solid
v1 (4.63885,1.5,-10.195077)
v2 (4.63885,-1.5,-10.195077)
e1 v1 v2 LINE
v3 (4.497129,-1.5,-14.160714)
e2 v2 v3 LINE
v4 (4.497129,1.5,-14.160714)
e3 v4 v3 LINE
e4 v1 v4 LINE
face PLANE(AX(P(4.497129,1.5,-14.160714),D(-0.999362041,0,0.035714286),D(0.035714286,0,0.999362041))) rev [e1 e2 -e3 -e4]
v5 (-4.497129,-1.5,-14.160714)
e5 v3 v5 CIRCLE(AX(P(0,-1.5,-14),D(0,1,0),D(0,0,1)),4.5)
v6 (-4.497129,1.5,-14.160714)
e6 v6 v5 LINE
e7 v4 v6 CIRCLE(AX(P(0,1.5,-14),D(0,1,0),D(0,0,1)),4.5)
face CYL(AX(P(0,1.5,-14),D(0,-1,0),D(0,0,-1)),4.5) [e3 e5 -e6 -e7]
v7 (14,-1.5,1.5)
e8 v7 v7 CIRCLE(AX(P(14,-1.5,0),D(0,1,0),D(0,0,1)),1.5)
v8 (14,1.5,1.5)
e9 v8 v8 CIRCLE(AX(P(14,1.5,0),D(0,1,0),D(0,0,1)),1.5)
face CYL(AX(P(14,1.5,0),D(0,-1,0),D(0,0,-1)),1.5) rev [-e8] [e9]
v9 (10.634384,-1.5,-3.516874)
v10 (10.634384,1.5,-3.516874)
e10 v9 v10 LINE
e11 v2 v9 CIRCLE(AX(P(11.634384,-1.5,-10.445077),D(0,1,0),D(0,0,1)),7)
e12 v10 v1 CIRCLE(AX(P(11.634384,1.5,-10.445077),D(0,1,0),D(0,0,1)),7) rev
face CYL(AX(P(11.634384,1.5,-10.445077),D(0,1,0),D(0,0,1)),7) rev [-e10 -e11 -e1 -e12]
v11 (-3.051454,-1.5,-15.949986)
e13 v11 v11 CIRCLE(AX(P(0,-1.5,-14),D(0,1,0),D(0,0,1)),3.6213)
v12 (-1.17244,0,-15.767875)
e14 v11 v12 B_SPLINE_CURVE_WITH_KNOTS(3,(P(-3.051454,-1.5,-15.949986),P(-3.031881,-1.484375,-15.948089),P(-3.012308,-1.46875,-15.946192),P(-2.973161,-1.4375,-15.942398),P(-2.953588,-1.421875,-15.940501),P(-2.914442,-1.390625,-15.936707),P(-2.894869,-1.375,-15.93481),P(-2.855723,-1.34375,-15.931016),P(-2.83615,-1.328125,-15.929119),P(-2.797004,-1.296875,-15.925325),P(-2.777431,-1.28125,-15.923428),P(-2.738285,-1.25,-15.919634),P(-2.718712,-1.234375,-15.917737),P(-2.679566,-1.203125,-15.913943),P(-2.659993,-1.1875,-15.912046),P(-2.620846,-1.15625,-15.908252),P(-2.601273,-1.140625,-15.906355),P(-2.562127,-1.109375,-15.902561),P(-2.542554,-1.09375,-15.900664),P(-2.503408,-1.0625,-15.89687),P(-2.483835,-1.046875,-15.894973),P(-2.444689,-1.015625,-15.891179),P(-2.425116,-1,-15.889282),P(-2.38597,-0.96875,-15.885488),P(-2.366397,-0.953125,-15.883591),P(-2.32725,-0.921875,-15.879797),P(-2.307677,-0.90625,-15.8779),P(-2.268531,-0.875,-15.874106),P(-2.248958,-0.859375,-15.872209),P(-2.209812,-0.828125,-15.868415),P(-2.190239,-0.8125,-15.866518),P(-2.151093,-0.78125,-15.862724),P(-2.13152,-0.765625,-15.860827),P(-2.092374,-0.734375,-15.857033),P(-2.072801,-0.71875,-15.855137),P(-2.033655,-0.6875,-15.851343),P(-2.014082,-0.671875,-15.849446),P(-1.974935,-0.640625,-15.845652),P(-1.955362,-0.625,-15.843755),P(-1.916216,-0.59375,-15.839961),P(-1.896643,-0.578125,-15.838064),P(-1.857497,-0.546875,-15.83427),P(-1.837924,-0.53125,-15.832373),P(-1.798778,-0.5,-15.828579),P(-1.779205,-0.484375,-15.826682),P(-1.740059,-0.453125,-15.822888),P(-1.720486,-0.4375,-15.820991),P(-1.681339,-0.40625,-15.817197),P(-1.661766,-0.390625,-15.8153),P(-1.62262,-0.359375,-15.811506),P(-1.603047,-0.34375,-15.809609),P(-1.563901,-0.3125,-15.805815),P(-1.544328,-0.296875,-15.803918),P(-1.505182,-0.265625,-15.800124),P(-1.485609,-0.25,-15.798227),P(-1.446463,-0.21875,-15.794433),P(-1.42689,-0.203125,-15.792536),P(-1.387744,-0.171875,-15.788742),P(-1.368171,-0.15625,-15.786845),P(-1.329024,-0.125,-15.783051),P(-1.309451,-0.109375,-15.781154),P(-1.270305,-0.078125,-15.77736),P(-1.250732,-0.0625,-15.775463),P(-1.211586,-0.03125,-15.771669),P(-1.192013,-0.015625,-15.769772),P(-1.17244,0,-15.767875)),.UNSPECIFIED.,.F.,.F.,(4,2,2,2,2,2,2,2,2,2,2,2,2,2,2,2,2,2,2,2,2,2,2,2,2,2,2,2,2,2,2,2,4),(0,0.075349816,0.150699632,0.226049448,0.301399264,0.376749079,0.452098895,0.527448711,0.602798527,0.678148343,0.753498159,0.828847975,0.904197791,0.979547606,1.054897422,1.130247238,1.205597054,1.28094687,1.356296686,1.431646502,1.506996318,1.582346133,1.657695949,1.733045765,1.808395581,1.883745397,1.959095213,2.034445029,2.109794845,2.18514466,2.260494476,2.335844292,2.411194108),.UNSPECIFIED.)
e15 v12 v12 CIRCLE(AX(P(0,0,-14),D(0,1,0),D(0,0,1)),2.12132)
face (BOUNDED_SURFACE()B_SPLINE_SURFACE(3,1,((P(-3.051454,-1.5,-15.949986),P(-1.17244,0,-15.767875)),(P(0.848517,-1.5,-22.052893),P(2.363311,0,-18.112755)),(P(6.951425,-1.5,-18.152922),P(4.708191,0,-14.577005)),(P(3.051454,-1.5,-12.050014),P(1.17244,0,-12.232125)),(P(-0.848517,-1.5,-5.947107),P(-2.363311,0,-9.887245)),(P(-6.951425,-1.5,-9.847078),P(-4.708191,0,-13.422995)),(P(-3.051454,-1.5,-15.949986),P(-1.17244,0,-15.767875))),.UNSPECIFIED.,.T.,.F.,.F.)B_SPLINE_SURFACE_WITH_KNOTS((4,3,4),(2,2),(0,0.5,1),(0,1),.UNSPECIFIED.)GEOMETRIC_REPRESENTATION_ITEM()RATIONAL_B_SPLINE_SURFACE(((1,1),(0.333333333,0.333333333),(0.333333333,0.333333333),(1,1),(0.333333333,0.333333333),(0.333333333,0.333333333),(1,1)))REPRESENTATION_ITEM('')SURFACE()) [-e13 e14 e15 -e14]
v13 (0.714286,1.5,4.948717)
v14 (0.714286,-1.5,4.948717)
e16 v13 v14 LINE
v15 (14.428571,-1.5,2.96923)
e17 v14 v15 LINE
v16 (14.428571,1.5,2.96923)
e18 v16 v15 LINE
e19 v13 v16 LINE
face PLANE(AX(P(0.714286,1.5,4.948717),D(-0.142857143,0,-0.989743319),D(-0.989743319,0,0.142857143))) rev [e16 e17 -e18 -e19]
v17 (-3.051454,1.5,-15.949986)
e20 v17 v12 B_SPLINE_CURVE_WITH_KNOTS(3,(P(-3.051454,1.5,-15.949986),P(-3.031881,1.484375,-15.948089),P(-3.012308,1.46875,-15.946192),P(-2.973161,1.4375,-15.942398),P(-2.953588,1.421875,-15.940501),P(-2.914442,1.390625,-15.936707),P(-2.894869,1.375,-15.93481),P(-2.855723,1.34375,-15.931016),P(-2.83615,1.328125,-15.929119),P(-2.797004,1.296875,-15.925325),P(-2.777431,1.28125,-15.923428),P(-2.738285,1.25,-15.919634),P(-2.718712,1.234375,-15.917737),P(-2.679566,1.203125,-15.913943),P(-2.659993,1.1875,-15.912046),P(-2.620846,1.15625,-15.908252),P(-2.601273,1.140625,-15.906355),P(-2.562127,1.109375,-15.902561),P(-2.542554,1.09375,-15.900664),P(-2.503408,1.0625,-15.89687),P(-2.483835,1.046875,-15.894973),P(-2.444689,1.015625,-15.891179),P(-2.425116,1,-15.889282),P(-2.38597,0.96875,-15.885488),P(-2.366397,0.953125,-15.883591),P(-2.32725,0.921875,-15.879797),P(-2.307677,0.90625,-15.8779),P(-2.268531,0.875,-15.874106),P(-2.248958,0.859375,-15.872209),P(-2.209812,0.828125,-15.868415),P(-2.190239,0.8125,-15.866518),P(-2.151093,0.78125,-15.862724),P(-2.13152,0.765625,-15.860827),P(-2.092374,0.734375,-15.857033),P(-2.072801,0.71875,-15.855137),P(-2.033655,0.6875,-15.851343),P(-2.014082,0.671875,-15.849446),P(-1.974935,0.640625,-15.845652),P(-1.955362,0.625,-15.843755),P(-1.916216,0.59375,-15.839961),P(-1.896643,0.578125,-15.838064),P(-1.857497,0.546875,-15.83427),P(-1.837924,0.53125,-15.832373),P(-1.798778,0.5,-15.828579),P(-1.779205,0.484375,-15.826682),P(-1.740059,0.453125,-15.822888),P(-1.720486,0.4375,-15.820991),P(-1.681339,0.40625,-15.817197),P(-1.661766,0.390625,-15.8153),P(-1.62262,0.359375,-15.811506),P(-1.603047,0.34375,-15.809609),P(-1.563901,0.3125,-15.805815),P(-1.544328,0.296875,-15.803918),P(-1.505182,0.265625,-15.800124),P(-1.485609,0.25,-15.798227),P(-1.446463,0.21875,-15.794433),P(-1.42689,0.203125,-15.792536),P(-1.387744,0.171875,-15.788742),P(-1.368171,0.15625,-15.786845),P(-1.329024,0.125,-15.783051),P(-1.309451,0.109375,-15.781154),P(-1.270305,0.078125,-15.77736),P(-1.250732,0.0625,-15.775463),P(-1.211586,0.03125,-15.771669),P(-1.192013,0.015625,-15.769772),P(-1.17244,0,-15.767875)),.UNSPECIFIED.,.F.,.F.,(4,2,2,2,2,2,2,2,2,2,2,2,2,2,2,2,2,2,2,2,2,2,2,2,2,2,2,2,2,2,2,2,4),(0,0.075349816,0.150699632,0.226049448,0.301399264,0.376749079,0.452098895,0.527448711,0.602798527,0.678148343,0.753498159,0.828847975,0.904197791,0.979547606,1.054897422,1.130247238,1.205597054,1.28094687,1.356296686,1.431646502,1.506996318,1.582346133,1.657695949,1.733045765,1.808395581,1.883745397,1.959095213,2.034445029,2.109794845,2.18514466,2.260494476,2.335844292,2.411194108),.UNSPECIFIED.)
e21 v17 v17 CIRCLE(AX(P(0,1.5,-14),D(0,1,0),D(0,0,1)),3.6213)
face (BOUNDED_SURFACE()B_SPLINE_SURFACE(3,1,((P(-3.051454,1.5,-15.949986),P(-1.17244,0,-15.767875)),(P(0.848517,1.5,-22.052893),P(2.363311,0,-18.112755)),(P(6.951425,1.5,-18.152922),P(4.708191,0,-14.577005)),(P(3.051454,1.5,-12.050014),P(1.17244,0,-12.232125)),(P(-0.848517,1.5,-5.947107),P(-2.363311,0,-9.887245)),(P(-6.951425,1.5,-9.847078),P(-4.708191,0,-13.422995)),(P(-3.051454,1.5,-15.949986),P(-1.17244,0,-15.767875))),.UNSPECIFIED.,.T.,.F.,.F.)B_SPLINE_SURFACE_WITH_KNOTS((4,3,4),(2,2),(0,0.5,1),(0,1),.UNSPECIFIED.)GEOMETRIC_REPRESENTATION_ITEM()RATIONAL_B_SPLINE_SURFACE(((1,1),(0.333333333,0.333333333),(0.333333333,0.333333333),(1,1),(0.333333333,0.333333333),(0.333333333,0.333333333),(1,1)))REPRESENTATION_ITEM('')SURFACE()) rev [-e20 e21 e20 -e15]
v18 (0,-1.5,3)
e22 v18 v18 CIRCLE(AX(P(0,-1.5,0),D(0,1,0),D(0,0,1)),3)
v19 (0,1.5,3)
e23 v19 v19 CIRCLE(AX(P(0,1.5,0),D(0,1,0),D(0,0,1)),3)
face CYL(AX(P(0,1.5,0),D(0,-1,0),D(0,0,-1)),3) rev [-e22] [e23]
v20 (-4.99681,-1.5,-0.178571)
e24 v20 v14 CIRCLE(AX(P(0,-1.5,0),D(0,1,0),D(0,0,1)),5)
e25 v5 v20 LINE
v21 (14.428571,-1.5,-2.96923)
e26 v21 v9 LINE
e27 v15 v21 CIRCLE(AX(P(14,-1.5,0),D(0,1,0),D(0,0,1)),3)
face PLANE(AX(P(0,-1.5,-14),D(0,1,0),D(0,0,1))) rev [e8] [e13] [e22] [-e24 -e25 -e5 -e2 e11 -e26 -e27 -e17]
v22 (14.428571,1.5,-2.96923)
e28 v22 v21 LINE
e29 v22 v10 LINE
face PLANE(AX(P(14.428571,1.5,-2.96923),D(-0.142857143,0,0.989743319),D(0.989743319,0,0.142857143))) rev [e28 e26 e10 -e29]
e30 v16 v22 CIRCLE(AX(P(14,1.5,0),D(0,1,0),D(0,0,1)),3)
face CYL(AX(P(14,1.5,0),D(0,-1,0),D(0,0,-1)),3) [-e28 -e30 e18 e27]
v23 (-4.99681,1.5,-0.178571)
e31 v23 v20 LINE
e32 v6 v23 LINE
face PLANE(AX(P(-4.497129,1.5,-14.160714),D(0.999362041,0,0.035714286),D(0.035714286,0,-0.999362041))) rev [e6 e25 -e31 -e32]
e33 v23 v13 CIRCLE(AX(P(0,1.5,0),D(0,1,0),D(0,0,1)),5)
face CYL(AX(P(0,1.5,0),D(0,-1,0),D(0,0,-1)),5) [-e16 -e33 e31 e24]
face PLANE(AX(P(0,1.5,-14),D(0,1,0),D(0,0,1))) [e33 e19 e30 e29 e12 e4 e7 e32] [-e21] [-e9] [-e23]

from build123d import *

# Parameters (mm, degrees)
SKETCH1_R           = 3
SKETCH1_R_2         = 1.5
BOSS_EXTRUDE1_DEPTH = 1.5
FILLET1_R           = 7


with BuildPart() as part:
    # Sketch1 → Boss-Extrude1 (new, symmetric)
    with BuildSketch(Plane(origin=(0, 0, 0), x_dir=(1, 0, 0), z_dir=(0, 1, 0))):
        with BuildLine():
            Line((-4.497129186, 14.160714286), (-4.996810207, 0.178571429))
            ThreePointArc((-4.996810207, 0.178571429), (-3.340250682, -3.720581323), (0.714285714, -4.948716593))
            Line((0.714285714, -4.948716593), (14.428571429, -2.969229956))
            ThreePointArc((14.428571429, -2.969229956), (17, 0), (14.428571429, 2.969229956))
            Line((14.428571429, 2.969229956), (4.847659913, 4.352115416))
            Line((4.847659913, 4.352115416), (4.497129186, 14.160714286))
            ThreePointArc((4.497129186, 14.160714286), (0, 18.5), (-4.497129186, 14.160714286))
        make_face()
        with Locations(Location((0, 0, 0), (0, 0, 270))):
            Circle(SKETCH1_R, mode=Mode.SUBTRACT)
        with Locations(Location((14, 0, 0), (0, 0, 270))):
            Circle(SKETCH1_R_2, mode=Mode.SUBTRACT)
    extrude(amount=BOSS_EXTRUDE1_DEPTH, both=True)

    # Cut-Loft1: read off the stored shape, not the designer's step
    # Cut-Loft1: loft between two sections, ruled curve by curve
    cut_loft1_from = [
        Edge.make_bspline([(-3.051453725, 1.5, -15.949985604), (0.848517484, 1.5, -22.052893053), (6.951424933, 1.5, -18.152921845), (3.051453725, 1.5, -12.050014396), (-0.848517484, 1.5, -5.947106947), (-6.951424933, 1.5, -9.847078155), (-3.051453725, 1.5, -15.949985604)], [0, 0, 0, 0, 0.5, 0.5, 0.5, 1, 1, 1, 1], 3, [1, 0.333333333, 0.333333333, 1, 0.333333333, 0.333333333, 1]),
    ]
    cut_loft1_to = [
        Edge.make_bspline([(-1.172439921, 0, -15.767875328), (2.363310734, 0, -18.11275517), (4.708190576, 0, -14.577004515), (1.172439921, 0, -12.232124672), (-2.363310734, 0, -9.88724483), (-4.708190576, 0, -13.422995485), (-1.172439921, 0, -15.767875328)], [0, 0, 0, 0, 0.5, 0.5, 0.5, 1, 1, 1, 1], 3, [1, 0.333333333, 0.333333333, 1, 0.333333333, 0.333333333, 1]),
    ]
    cut_loft1 = Solid(Shell([*[Face.make_surface_from_curves(cut_loft1_from[k], cut_loft1_to[k]) for k in range(1)], Face(Wire(cut_loft1_from)), Face(Wire(cut_loft1_to))]))
    add(cut_loft1, mode=Mode.SUBTRACT)

    # Fillet1
    fillet1_edges = [part.edges().sort_by_distance(p)[0] for p in [
        (4.847659913, 0, -4.352115416),
    ]]
    fillet(fillet1_edges, radius=FILLET1_R)

    # Mirror1: Cut-Loft1 across plane
    add(cut_loft1.mirror(Plane.ZX), mode=Mode.SUBTRACT)


solid = part.part
